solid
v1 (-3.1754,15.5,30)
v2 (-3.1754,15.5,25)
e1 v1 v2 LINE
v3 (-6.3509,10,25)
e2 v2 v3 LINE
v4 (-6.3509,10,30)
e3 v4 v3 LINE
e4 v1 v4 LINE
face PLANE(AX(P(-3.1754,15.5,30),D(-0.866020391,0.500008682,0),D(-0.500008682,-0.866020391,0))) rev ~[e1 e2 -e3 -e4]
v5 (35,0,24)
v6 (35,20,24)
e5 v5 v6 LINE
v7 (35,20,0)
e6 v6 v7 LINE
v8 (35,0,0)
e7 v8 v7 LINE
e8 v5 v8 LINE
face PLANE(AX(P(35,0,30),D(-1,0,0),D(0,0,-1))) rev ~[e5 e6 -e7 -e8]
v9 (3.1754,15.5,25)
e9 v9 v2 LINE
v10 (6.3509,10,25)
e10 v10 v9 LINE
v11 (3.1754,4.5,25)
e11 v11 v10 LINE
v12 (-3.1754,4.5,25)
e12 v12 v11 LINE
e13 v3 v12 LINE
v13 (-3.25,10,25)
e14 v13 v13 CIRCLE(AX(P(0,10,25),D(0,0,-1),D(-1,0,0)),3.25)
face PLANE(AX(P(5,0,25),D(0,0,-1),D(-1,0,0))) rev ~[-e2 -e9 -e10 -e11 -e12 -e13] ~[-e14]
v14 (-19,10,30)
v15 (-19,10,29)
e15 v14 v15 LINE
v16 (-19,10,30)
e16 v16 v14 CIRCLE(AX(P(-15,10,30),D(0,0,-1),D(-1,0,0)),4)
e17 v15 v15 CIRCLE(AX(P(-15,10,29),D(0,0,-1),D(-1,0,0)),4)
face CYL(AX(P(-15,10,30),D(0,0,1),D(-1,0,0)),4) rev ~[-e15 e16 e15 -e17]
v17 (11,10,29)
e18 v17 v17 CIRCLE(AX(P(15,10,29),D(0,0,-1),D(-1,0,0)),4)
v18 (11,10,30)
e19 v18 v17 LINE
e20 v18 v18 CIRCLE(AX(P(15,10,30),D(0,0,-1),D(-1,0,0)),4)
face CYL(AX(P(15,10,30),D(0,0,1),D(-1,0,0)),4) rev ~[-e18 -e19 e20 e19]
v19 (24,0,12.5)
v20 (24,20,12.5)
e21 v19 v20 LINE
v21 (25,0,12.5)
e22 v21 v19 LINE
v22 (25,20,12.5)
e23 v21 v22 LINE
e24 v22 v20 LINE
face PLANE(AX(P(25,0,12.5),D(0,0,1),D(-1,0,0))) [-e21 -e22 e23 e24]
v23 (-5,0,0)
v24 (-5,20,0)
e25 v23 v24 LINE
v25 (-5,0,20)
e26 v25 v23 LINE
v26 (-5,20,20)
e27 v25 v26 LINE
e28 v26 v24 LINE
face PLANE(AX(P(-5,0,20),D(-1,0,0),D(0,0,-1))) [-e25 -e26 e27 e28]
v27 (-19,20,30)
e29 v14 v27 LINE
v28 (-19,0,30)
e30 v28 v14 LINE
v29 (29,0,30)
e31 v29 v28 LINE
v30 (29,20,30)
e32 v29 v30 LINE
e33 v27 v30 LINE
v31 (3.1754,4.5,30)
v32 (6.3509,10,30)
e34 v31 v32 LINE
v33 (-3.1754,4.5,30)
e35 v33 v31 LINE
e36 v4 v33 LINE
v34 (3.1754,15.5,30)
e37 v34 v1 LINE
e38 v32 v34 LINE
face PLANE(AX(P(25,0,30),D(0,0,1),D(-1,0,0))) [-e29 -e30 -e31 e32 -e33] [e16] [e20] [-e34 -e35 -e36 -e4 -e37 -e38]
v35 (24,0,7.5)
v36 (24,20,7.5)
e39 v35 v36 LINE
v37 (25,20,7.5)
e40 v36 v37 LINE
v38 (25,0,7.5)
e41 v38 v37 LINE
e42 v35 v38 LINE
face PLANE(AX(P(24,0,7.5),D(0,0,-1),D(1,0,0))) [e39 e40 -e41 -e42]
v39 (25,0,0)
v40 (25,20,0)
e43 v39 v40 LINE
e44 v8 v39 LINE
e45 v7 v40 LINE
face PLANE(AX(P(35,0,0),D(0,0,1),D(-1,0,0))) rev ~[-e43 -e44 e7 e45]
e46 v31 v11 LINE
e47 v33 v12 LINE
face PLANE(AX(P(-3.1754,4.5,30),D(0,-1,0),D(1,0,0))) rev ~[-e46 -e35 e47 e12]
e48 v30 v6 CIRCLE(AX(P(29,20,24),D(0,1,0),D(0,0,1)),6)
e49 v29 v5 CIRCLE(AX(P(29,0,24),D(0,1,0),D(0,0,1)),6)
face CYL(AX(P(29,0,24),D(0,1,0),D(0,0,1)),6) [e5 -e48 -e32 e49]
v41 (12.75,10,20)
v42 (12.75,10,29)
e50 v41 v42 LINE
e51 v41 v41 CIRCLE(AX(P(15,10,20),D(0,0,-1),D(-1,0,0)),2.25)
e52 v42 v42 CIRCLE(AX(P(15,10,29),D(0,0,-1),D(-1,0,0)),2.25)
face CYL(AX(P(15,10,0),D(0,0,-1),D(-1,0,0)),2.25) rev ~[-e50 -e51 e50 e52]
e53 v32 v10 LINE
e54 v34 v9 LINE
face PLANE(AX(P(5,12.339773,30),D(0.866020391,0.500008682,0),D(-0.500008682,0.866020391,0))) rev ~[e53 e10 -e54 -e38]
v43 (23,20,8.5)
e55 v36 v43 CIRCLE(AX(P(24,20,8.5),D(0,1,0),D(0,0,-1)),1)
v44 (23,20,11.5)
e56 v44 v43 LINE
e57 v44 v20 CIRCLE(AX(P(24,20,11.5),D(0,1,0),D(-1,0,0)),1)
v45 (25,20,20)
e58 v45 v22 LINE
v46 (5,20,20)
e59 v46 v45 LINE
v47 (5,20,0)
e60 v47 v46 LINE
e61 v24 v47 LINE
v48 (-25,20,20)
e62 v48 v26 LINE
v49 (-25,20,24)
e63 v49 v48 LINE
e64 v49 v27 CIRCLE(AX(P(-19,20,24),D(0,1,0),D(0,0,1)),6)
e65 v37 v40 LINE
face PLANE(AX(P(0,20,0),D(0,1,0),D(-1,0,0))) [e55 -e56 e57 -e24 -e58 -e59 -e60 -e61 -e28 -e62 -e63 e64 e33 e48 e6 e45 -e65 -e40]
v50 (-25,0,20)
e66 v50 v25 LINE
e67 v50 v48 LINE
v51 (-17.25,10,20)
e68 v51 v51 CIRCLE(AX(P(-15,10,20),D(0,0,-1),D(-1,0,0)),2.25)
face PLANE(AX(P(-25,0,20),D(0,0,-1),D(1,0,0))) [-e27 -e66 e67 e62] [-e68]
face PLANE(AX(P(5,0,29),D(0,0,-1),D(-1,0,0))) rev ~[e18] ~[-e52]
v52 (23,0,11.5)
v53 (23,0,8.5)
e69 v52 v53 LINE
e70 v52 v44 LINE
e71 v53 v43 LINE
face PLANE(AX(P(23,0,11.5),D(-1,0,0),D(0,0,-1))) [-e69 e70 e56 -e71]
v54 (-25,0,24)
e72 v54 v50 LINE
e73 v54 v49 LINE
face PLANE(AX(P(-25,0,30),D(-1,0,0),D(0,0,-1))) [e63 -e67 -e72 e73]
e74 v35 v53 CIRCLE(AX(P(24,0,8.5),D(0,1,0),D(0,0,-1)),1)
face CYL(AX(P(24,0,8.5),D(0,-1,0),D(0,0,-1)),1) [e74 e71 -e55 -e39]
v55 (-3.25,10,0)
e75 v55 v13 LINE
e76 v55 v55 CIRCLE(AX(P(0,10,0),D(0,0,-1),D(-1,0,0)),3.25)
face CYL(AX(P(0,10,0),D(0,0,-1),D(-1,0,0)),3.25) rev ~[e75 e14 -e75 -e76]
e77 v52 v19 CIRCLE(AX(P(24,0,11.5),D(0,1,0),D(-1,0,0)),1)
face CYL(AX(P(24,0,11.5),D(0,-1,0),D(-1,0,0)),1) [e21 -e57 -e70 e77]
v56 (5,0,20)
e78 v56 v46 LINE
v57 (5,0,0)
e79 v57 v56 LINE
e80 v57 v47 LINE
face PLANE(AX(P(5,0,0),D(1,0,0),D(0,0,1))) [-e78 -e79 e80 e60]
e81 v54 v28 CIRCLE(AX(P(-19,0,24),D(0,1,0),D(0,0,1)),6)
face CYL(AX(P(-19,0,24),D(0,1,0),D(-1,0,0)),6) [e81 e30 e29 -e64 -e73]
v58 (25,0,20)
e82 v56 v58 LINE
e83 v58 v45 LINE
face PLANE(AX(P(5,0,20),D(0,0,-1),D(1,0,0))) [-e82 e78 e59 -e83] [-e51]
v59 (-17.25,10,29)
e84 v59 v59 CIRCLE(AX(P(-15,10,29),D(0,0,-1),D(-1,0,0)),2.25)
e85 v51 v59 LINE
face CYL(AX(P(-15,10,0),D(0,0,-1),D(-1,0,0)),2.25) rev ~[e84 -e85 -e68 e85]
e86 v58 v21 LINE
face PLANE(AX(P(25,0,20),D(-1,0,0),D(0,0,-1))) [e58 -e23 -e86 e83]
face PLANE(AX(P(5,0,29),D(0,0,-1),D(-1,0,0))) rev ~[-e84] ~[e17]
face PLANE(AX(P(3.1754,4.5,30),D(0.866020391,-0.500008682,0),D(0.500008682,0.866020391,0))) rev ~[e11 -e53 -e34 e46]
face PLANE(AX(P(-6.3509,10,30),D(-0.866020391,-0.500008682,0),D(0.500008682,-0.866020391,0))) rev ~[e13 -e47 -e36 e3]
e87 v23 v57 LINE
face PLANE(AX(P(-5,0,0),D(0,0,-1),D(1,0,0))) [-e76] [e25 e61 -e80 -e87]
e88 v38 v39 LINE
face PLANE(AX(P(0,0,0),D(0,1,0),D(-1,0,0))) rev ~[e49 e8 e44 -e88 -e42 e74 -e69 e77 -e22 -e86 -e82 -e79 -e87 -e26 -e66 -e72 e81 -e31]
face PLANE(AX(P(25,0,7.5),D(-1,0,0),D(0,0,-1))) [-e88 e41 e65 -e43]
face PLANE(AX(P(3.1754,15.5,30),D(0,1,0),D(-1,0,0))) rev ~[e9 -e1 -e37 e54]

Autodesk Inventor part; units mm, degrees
ref_plane "YZ Plane" through (0, 0, 0) normal (1, 0, 0) x (0, 1, 0)
ref_plane "XZ Plane" through (0, 0, 0) normal (0, 1, 0) x (-1, 0, 0)
ref_plane "XY Plane" through (0, 0, 0) normal (0, 0, 1) x (1, 0, 0)
sketch "Szkic1" plane through (0, 0, 0) normal (0, 1, 0) x (-1, 0, 0)
  line L0 (25, 20) -> (5, 20)
  line L1 (5, 20) -> (5, 0)
  line L2 (5, 0) -> (25, 0)
  line L3 (25, 0) -> (25, 20)
  line L4 (-5, 20) -> (-25, 20)
  line L5 (-25, 20) -> (-25, 0)
  line L6 (-25, 0) -> (-5, 0)
  line L7 (-5, 0) -> (-5, 20)
  line L8 (25, 0) -> (-25, 0)
  line L9 (-25, 0) -> (-25, 30)
  line L10 (-25, 30) -> (25, 30)
  line L11 (25, 30) -> (25, 0)
  line L12 (-25, 30) -> (-35, 30)
  line L13 (-35, 30) -> (-35, 0)
  line L14 (-35, 0) -> (-25, 0)
  line L15 (-25, 0) -> (-25, 30)
  line L16 (-25, 12.5) -> (-24, 12.5)
  line L17 (-23, 11.5) -> (-23, 8.5)
  line L18 (-24, 7.5) -> (-25, 7.5)
  line L19 (-25, 7.5) -> (-25, 12.5)
  arc A0 (-23, 11.5) -> (-24, 12.5) centre (-24, 11.5) ccw
  arc A1 (-24, 7.5) -> (-23, 8.5) centre (-24, 8.5) ccw
  point P0 (0, 0)
  point P1 (-15, 20)
  point P2 (15, 20)
  point P3 (15, 0)
  point P4 (-5, 0)
  point P5 (5, 0)
  point P6 (-23, 7.5)
  point P7 (-23, 12.5)
  dimension "d0" = 20
  dimension "d1" = 20
  dimension "d2" = 20
  dimension "d3" = 20
  dimension "d4" = 50
  dimension "d5" = 25
  dimension "d6" = 10
  dimension "d28" = 10
  dimension "d29" = 5
  dimension "d30" = 7.5
  dimension "d31" = 2
  dimension "d33" = 1
extrude "Wyciągnięcie proste1" add sketch "Szkic1" along normal blind 20 contours L0 L1 L8 L7 L4 L9 L10 L11 | L9 L5 L14 L13 L12 | L16 A0 L17 A1 L18 L5
sketch "Szkic2" plane through (5, 0, 0) normal (0, 0, -1) x (-1, 0, 0)
  circle A0 centre (5, 10) radius 3.25
  circle A1 centre (20, 10) radius 2.25
  circle A2 centre (-10, 10) radius 2.25
  line L0 (0, 0) -> (0, 20) projected
  line L1 (0, 0) -> (10, 0) projected
  line L2 (-20, 0) -> (0, 0) projected
  line L3 (30, 0) -> (30, 20) projected
  circle A3 centre (-10, 10) radius 4
  circle A4 centre (20, 10) radius 4
  line L4 (1.8246, 15.5) -> (8.1754, 15.5)
  line L5 (8.1754, 15.5) -> (11.3509, 10)
  line L6 (11.3509, 10) -> (8.1754, 4.5)
  line L7 (8.1754, 4.5) -> (1.8246, 4.5)
  line L8 (1.8246, 4.5) -> (-1.3509, 10)
  line L9 (-1.3509, 10) -> (1.8246, 15.5)
  line L10 (-20, 0) -> (-20, 20) projected
  point P0 (5, 0)
  dimension "d9" = 6.5
  dimension "d10" = 5
  dimension "d11" = 10
  dimension "d13" = 10
  dimension "d14" = 10
  dimension "d15" = 4.5
  dimension "d16" = 4.5
  dimension "d20" = 8
  dimension "d21" = 8
  dimension "d25" = 11
  dimension "d32" = 10
extrude "Wyciągnięcie proste2" cut sketch "Szkic2" against normal through all contours A0 | A1 | A2
extrude "Wyciągnięcie proste3" cut sketch "Szkic2" along normal blind 5 from surface at -30 contours A0 | L8 L9 L0 | L0 L9 L4 L5 L6 L7 L8
fillet "Zaokrąglenie1" radius 6 2 edges at (-25, 10, 30) (35, 10, 30)
extrude "Wyciągnięcie proste4" cut sketch "Szkic2" along normal blind 1 from surface at -30 contours A1 | A2 | A3 | A4
properties part number "ZItemMountCable" material "Tworzywo sztuczne ABS"
